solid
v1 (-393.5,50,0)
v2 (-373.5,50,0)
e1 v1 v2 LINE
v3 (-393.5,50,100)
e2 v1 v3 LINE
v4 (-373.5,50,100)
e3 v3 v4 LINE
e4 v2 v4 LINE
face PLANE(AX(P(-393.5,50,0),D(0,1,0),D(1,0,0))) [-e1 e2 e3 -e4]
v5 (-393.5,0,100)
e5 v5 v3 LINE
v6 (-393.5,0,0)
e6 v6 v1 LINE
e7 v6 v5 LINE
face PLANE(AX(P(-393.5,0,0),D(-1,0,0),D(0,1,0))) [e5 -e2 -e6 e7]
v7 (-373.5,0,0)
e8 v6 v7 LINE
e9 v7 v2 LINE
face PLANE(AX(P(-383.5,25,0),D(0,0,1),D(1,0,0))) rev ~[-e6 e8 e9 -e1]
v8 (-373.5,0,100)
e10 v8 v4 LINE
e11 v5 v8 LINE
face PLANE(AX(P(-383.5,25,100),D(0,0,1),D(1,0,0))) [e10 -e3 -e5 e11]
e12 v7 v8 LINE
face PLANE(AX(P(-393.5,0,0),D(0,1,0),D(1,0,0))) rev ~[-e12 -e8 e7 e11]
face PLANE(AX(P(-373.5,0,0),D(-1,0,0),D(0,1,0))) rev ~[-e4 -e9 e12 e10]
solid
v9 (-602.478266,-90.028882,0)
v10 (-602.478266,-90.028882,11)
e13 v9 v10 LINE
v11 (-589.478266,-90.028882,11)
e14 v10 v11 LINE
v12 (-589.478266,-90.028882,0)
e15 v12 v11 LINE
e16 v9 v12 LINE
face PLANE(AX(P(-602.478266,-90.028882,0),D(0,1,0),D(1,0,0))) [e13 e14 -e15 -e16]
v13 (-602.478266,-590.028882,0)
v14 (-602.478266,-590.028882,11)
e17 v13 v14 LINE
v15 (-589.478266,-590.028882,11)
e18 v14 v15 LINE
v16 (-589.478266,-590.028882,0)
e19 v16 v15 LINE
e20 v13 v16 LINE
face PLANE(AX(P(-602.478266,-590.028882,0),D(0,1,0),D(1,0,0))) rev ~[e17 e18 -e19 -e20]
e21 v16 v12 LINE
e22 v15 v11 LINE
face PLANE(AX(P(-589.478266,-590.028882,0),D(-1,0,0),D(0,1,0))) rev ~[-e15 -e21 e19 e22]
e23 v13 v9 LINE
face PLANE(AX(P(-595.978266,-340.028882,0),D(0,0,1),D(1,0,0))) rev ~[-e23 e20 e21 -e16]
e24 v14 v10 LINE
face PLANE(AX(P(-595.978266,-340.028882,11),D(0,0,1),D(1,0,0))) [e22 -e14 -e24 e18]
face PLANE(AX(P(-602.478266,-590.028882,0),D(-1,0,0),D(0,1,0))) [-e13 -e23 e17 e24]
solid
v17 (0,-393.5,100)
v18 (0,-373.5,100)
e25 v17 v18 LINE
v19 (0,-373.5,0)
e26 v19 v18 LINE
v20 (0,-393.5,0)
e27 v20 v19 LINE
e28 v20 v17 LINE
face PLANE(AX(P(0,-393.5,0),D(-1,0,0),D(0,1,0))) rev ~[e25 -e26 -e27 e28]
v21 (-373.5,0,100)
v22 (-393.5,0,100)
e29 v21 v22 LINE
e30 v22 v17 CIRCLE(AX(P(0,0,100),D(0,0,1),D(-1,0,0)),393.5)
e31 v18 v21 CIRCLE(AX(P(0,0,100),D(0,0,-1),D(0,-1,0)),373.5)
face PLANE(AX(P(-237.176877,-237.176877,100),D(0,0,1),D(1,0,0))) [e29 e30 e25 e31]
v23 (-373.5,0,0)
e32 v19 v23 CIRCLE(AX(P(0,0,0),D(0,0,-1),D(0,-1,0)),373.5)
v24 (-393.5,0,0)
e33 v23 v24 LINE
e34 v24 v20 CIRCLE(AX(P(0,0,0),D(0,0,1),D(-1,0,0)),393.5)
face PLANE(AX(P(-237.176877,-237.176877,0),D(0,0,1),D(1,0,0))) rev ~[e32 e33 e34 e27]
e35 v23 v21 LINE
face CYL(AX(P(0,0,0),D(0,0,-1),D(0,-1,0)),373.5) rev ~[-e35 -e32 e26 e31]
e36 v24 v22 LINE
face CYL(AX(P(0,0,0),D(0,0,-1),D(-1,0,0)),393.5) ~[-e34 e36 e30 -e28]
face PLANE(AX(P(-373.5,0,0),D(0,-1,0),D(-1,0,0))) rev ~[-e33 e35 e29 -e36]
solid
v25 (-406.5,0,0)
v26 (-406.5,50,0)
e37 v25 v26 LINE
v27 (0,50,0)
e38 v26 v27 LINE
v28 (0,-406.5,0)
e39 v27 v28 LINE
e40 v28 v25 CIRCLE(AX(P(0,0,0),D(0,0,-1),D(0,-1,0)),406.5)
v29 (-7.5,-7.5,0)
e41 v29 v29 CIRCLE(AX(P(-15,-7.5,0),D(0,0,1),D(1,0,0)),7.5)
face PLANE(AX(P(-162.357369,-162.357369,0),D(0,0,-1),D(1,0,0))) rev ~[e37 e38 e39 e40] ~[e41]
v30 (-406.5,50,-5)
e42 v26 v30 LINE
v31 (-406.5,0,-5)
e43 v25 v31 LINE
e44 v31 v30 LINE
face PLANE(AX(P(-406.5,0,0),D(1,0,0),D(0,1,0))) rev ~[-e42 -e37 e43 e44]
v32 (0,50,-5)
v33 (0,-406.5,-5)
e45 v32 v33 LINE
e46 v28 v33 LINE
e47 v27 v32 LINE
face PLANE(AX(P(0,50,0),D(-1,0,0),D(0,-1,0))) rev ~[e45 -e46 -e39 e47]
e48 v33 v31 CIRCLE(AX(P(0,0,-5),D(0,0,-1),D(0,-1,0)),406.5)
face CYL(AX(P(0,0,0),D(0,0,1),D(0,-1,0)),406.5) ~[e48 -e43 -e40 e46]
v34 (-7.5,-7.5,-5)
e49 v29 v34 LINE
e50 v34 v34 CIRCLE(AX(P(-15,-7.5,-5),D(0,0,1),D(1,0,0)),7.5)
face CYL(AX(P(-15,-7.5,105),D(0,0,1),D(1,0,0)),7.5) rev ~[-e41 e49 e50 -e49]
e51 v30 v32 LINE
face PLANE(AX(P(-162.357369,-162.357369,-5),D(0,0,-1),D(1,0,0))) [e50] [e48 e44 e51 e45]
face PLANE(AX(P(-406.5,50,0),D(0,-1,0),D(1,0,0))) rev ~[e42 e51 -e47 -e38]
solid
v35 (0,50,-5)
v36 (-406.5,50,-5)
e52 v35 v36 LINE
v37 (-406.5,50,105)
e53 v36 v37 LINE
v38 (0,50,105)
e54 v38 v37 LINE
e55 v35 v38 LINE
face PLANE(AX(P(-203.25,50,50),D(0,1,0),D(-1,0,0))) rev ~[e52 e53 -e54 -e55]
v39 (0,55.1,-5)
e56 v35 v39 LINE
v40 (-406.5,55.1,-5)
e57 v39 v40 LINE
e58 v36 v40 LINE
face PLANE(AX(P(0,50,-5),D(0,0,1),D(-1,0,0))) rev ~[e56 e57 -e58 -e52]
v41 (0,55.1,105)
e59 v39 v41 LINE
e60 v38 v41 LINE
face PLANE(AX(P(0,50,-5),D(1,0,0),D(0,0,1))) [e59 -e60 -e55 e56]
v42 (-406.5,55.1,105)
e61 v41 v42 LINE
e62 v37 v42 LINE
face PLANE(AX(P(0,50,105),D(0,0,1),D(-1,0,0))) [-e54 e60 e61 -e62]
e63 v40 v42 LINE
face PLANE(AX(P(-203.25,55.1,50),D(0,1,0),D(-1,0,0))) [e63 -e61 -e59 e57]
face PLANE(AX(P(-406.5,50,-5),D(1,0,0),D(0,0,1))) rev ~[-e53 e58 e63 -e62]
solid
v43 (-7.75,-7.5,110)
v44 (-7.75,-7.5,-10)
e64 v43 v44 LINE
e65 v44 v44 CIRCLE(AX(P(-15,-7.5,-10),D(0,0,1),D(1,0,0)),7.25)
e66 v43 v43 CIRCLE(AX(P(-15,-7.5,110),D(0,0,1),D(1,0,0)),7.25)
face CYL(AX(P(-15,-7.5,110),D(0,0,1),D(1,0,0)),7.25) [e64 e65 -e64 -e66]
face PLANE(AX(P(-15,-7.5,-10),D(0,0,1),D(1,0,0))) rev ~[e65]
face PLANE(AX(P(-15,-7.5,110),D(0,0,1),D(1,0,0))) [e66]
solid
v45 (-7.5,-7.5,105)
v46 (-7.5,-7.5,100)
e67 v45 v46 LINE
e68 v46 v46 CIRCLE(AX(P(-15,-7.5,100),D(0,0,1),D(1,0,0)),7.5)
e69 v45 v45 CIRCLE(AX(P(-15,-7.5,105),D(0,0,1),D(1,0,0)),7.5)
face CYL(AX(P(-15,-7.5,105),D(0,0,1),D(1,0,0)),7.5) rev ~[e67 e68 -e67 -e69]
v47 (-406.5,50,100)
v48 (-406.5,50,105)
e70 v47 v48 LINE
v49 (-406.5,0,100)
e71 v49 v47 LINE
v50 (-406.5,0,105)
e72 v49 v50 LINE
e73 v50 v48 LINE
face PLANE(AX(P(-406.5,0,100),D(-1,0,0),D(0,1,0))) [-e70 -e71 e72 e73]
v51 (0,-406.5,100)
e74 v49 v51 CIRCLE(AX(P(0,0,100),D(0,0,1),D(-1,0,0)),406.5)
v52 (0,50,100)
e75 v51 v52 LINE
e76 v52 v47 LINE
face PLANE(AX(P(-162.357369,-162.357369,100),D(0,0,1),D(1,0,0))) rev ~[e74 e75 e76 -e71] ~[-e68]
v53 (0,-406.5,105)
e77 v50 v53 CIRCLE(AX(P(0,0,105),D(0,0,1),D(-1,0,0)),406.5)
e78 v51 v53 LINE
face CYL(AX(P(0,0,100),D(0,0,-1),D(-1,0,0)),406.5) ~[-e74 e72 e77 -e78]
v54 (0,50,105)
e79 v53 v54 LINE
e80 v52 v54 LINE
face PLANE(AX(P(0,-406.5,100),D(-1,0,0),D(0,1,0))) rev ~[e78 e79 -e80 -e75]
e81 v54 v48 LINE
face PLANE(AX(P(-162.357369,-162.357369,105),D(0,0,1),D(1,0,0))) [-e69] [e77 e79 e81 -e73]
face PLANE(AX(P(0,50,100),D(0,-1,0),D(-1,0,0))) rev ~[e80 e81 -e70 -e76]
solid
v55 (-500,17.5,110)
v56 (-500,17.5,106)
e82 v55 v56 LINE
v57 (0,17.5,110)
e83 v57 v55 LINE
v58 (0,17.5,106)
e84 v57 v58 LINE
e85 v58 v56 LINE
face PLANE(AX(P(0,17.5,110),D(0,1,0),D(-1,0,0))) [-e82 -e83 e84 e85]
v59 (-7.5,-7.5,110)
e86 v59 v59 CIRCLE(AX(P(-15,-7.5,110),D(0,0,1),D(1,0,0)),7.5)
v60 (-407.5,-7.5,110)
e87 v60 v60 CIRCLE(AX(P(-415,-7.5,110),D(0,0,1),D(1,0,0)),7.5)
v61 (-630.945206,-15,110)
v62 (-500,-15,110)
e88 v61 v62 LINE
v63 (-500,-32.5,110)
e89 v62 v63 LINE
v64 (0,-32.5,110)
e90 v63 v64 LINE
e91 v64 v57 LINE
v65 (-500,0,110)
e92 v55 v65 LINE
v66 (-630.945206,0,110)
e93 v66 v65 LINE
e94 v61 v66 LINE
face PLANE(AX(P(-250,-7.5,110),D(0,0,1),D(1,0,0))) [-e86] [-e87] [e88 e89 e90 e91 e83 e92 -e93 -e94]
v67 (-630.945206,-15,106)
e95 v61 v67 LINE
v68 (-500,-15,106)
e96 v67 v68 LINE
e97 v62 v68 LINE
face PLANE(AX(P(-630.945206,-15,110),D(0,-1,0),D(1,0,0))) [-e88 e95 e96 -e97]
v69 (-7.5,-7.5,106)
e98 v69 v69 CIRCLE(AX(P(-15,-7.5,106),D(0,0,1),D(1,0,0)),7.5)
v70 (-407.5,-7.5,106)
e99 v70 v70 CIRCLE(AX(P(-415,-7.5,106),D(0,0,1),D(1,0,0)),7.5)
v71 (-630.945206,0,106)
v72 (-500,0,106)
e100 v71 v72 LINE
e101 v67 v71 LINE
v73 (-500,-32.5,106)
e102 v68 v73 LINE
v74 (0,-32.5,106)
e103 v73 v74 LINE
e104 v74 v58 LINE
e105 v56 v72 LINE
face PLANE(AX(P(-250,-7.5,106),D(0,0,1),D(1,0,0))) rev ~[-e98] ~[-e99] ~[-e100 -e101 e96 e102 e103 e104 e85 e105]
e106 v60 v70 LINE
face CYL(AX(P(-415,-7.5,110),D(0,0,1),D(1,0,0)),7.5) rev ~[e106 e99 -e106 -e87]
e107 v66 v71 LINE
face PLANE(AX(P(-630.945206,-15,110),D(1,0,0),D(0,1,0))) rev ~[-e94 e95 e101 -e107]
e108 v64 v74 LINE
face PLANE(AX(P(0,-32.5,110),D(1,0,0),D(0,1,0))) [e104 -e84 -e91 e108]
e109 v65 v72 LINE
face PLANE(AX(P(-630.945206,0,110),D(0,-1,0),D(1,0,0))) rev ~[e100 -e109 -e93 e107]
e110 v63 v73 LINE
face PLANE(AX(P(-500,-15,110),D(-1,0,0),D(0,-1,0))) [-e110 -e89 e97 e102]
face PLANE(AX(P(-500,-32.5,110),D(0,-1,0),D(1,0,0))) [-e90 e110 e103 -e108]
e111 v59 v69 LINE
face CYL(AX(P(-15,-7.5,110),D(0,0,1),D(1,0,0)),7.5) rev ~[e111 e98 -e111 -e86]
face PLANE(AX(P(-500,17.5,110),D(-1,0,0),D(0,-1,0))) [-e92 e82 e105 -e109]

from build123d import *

# Parameters (mm, degrees)
F1_DEPTH  = 100
F4_DEPTH  = 5
F6_W      = 393.5
F6_H      = 50
F6_W_2    = 13
F7_DEPTH  = 5
F9_W      = 406.5
F9_H      = 110
F10_DEPTH = 5.1
F11_R     = 7.5
F12_DEPTH = 110.001
F14_R     = 7.25
F15_DEPTH = 120
F17_R     = 7.5
F17_W     = 130.9452056885
F17_H     = 15
F18_DEPTH = 4
F0_W      = 20
F0_H      = 50
F19_DEPTH = 100
F21_W     = 13
F21_H     = 500
F22_DEPTH = 11


# Not quite as in the source:
# - a feature names something its author has since deleted; it is built from what else it names
# - the program builds the solid bodies; features that only make, move or delete a surface that nothing else refers to are left out


with BuildPart() as f1:
    # F0 (on Top) → F1 (new body)
    with BuildSketch(Plane.XY):
        with BuildLine():
            ThreePointArc((0, -373.5), (-264.1043827732, -264.1043827732), (-373.5, 0))
            Line((-373.5, 0), (-393.5, 0))
            ThreePointArc((-393.5, 0), (-278.2465183969, -278.2465183969), (0, -393.5))
            Line((0, -393.5), (0, -373.5))
        make_face()
    extrude(amount=F1_DEPTH)


with BuildPart() as f4:
    # F3 (on offset) → F4 (new body)
    with BuildSketch(Plane(origin=(0, 0, 0), x_dir=(1, 0, 0), z_dir=(0, 0, -1))):
        with BuildLine():
            Line((-393.5, 0), (0, 0))
            Line((0, 0), (0, 393.5))
            ThreePointArc((0, 393.5), (-278.2465183969, 278.2465183969), (-393.5, 0))
        make_face()
        Polygon((0, -50), (0, 0), (-393.5, 0), (-406.5, 0), (-406.5, -50), align=None)
        with BuildLine():
            ThreePointArc((-393.5, 0), (-278.2465183969, 278.2465183969), (0, 393.5))
            Line((0, 393.5), (0, 406.5))
            ThreePointArc((0, 406.5), (-287.4389065523, 287.4389065523), (-406.5, 0))
            Line((-406.5, 0), (-393.5, 0))
        make_face()
    extrude(amount=F4_DEPTH)


with BuildPart() as f7:
    # F6 (on offset) → F7 (new body)
    with BuildSketch(Plane.XY.offset(100)):
        with BuildLine():
            Line((0, -393.5), (0, 0))
            Line((0, 0), (-393.5, 0))
            ThreePointArc((-393.5, 0), (-278.2465183969, -278.2465183969), (0, -393.5))
        make_face()
        with Locations((-196.75, 25)):
            Rectangle(F6_W, F6_H)
        with BuildLine():
            Line((0, -406.5), (0, -393.5))
            ThreePointArc((0, -393.5), (-278.2465183969, -278.2465183969), (-393.5, 0))
            Line((-393.5, 0), (-406.5, 0))
            ThreePointArc((-406.5, 0), (-287.4389065523, -287.4389065523), (0, -406.5))
        make_face()
        with Locations((-400, 25)):
            Rectangle(F6_W_2, F6_H)
    extrude(amount=F7_DEPTH)


with BuildPart() as f10:
    # F9 (on offset) → F10 (new body)
    with BuildSketch(Plane(origin=(0, 50, 0), x_dir=(-1, 0, 0), z_dir=(0, 1, 0))):
        with Locations((203.25, 50)):
            Rectangle(F9_W, F9_H)
    extrude(amount=F10_DEPTH)


with BuildPart() as f12_tool:
    # F11 (on face) → F12 (new body, through all)
    with BuildSketch(Plane.XY.offset(105)):
        with Locations((-15, -7.5)):
            Circle(F11_R)
    extrude(amount=-F12_DEPTH)


with BuildPart() as f4_1:
    add(f4.part)

    # F12: cut by f12_tool
    add(f12_tool.part, mode=Mode.SUBTRACT)


with BuildPart() as f7_1:
    add(f7.part)

    # F12: cut by f12_tool
    add(f12_tool.part, mode=Mode.SUBTRACT)


with BuildPart() as f15:
    # F14 (on offset) → F15 (new body)
    with BuildSketch(Plane.XY.offset(110)):
        with Locations((-15, -7.5)):
            Circle(F14_R)
    extrude(amount=-F15_DEPTH)


with BuildPart() as f18:
    # F17 (on offset) → F18 (new body)
    with BuildSketch(Plane.XY.offset(110)):
        Polygon((-500, -32.5), (0, -32.5), (0, 17.5), (-500, 17.5), (-500, 0), (-500, -15), align=None)
        with Locations((-415, -7.5)):
            Circle(F17_R, mode=Mode.SUBTRACT)
        with Locations((-15, -7.5)):
            Circle(F17_R, mode=Mode.SUBTRACT)
        with Locations((-565.4726028442, -7.5)):
            Rectangle(F17_W, F17_H)
    extrude(amount=-F18_DEPTH)


with BuildPart() as f19:
    # F0 (on Top) → F19 (new body)
    with BuildSketch(Plane.XY):
        with Locations((-383.5, 25)):
            Rectangle(F0_W, F0_H)
    extrude(amount=F19_DEPTH)


with BuildPart() as f22:
    # F21 (on Top) → F22 (new body)
    with BuildSketch(Plane.XY):
        with Locations((-595.9782657623, -340.0288820267)):
            Rectangle(F21_W, F21_H)
    extrude(amount=F22_DEPTH)


solid = Compound([f1.part, f10.part, f4_1.part, f7_1.part, f15.part, f18.part, f19.part, f22.part])
